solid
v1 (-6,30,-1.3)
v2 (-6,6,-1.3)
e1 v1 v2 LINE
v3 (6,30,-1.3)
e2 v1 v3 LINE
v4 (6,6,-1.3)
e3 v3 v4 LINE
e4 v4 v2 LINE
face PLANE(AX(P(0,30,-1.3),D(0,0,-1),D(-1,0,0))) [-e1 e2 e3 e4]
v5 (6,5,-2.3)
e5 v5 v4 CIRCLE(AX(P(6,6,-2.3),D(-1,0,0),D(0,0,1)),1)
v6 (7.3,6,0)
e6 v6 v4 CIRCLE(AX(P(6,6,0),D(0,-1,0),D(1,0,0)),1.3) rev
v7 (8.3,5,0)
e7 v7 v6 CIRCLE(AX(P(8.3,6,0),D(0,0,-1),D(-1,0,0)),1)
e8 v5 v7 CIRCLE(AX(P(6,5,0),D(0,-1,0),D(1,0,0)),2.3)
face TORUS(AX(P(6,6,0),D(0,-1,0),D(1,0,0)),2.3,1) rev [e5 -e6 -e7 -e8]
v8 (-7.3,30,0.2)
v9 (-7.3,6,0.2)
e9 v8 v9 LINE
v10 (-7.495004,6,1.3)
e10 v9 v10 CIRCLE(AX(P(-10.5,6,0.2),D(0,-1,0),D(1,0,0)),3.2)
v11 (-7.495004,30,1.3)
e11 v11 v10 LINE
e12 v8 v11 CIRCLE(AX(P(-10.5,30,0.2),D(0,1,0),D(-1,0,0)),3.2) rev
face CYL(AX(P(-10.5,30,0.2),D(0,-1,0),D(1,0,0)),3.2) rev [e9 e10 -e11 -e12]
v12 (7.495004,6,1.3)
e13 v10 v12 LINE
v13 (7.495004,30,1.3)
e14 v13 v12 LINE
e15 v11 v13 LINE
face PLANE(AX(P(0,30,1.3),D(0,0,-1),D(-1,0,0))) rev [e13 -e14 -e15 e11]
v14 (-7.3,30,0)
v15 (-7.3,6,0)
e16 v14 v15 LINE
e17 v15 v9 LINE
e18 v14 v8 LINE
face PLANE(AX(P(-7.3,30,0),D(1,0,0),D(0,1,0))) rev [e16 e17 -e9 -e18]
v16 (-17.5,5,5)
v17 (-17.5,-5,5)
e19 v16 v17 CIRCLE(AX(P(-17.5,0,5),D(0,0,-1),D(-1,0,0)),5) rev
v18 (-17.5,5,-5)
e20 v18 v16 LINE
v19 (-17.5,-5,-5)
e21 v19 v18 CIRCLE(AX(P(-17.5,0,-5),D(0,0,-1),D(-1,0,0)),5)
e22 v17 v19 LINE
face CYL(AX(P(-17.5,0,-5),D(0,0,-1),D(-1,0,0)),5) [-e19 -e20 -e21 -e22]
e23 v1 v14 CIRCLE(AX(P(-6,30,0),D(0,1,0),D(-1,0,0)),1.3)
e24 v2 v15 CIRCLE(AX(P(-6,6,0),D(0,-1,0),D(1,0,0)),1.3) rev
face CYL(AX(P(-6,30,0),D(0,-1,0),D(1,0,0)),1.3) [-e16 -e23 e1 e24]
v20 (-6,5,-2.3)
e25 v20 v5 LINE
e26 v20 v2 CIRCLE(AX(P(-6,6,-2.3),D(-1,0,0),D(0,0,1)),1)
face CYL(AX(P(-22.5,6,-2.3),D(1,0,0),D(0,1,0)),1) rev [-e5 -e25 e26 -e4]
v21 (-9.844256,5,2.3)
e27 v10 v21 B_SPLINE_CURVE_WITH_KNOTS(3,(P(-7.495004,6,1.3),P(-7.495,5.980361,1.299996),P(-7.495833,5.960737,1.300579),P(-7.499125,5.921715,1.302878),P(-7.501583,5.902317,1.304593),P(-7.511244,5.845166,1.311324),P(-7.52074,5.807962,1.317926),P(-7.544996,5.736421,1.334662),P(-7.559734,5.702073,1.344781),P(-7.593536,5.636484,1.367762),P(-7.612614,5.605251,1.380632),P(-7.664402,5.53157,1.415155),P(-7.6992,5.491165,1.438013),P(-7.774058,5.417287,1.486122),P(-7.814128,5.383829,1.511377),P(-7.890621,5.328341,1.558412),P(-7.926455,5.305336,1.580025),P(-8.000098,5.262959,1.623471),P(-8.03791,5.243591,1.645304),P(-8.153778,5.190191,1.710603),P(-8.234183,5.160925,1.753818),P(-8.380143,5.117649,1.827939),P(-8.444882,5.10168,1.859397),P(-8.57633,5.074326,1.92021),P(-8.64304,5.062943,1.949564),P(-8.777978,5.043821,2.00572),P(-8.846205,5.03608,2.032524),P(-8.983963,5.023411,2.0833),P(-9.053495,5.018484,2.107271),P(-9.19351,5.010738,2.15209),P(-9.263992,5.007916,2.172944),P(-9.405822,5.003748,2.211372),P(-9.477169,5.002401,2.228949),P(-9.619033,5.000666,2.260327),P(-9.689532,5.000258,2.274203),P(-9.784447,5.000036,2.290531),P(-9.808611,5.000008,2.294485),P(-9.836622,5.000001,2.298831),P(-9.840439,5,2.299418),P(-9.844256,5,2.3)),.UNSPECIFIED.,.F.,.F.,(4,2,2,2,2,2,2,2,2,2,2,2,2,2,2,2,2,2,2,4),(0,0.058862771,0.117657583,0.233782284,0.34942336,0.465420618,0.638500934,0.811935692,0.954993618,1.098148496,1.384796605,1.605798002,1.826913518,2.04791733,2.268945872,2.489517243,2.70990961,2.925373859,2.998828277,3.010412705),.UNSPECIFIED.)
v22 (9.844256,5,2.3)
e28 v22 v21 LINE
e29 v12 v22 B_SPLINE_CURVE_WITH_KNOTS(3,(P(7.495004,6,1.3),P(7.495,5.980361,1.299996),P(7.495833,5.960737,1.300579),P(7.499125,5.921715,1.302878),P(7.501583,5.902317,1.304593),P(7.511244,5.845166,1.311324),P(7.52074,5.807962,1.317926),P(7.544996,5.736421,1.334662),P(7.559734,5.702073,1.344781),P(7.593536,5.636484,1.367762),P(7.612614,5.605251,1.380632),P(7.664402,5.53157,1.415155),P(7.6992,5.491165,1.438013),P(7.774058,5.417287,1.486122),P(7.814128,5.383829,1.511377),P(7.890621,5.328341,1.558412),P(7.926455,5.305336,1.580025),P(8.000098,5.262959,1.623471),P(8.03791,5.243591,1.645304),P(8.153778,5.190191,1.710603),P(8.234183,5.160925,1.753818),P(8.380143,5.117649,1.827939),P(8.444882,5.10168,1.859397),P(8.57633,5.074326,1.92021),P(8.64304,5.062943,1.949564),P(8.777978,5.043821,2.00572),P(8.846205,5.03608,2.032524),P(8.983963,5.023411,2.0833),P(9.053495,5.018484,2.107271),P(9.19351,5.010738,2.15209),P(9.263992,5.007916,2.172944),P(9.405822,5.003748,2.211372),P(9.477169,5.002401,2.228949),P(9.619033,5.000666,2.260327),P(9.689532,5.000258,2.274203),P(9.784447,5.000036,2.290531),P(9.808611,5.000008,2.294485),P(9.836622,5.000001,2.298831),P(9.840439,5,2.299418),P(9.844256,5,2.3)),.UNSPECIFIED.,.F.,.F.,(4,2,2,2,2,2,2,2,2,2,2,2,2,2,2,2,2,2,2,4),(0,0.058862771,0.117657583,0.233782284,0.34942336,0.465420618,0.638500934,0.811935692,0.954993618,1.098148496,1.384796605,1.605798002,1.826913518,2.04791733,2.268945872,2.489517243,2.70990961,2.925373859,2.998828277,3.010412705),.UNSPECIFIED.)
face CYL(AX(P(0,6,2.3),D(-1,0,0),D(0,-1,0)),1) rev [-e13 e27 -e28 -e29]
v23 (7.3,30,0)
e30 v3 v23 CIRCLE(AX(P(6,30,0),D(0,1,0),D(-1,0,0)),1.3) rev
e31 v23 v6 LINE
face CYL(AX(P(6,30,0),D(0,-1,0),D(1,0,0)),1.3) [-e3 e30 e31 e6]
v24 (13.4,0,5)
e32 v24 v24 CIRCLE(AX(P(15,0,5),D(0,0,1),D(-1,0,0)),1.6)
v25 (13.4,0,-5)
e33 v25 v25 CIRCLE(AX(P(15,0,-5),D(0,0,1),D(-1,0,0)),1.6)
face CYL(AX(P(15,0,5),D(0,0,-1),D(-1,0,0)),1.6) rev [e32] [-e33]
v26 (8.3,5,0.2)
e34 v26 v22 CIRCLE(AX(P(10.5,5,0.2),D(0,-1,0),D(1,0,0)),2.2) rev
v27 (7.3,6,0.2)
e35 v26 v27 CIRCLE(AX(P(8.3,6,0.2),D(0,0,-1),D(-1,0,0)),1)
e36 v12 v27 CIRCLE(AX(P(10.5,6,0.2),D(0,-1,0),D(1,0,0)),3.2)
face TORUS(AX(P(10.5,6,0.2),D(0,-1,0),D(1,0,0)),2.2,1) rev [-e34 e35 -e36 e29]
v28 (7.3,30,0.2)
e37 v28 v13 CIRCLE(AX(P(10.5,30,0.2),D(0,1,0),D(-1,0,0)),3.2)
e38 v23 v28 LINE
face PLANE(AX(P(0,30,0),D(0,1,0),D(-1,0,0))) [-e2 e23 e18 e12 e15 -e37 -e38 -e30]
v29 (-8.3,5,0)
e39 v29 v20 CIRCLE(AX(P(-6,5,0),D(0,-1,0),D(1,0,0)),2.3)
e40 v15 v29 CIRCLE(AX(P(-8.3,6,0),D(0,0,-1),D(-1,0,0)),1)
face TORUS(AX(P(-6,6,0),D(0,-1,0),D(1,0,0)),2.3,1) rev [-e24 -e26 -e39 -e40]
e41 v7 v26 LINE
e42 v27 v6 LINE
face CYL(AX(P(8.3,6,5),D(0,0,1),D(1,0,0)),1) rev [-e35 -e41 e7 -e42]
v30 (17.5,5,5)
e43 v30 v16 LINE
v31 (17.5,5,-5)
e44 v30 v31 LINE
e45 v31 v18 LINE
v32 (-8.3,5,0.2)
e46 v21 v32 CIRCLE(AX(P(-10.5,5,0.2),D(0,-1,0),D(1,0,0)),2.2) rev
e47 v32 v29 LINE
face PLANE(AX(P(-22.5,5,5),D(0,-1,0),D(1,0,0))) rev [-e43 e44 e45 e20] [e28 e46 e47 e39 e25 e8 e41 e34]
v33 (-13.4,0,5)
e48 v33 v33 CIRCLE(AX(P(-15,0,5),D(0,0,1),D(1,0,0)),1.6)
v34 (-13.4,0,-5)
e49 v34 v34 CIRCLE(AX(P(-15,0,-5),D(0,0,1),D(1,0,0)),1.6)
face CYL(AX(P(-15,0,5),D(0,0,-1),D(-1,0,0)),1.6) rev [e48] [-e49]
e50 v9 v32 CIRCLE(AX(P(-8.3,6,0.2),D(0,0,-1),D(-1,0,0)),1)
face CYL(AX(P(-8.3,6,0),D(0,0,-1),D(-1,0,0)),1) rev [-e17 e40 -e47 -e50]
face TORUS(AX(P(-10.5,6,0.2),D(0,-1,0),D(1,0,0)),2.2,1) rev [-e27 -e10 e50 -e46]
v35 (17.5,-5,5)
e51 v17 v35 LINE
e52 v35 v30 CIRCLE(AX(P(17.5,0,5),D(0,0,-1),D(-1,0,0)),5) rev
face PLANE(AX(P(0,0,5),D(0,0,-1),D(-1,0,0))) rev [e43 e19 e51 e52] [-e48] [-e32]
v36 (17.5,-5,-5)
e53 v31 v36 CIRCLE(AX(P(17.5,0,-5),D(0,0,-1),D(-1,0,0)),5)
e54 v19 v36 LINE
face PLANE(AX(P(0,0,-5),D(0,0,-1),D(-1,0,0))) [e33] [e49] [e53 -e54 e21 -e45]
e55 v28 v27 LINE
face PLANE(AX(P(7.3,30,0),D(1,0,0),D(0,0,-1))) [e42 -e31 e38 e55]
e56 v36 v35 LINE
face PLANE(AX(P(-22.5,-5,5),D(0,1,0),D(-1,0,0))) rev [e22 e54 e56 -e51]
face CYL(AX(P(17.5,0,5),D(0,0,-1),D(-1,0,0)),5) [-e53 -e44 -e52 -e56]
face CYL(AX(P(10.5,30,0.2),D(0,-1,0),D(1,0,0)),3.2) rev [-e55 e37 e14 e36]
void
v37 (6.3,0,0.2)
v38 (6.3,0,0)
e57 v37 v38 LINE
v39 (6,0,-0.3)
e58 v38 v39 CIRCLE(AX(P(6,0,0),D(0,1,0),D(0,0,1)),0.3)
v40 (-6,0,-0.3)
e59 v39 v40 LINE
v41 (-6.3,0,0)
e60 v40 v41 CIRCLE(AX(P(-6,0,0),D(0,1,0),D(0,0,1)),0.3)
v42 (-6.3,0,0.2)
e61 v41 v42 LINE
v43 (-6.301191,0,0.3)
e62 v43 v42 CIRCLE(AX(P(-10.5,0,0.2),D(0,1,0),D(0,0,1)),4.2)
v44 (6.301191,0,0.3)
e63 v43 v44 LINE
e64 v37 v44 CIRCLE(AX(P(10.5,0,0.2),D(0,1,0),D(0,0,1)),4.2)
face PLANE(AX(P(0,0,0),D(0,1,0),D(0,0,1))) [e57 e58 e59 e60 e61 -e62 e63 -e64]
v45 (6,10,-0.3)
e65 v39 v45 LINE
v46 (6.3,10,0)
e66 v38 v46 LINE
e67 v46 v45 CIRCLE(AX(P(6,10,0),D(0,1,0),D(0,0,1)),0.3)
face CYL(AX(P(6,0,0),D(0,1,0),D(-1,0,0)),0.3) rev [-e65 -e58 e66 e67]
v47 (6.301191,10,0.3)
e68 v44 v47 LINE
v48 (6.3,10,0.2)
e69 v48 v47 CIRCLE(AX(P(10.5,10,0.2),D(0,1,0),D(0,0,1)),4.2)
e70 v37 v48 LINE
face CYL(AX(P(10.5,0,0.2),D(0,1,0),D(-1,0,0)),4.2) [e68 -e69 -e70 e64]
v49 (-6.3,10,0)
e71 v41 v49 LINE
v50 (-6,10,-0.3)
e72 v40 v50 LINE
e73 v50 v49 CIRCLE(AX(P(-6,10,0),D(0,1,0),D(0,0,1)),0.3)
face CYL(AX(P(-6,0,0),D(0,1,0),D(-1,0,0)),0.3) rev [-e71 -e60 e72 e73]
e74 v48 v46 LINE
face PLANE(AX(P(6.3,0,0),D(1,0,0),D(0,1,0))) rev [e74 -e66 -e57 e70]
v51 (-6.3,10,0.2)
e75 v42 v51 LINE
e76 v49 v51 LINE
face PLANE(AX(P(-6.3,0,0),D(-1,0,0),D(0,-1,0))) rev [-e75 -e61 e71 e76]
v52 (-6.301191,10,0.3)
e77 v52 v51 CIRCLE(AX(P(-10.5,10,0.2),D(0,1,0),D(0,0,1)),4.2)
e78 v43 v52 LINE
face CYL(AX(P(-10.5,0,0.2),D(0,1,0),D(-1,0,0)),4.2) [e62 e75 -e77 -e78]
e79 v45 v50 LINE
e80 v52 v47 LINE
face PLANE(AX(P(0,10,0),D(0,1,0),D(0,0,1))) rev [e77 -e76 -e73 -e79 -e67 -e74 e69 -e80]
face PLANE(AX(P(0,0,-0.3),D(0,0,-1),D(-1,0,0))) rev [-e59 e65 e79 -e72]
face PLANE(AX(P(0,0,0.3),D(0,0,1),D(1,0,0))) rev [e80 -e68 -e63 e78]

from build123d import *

# Parameters (mm, degrees)
SKETCH_1_W          = 45
SKETCH_1_H          = 10
SKETCH_1_R          = 1.6
EXTRUDE_1_DEPTH     = 5
FILLET_1_RADIUS     = 5
FILLET_1_LENGTH     = 10
FILLET_2_RADIUS     = 5
FILLET_2_LENGTH     = 10
EXTRUDE_2_DEPTH     = 25
FILLET_8_R          = 1
CUT_EXTRUDE_START   = -20
CUT_EXTRUDE_1_DEPTH = 10


with BuildPart() as part:
    # Эскиз1 → Бобышка-Вытянуть1 (new, symmetric)
    with BuildSketch(Plane.XY):
        Rectangle(SKETCH_1_W, SKETCH_1_H)
        with Locations((-15, 0)):
            Circle(SKETCH_1_R, mode=Mode.SUBTRACT)
        with Locations(Location((15, 0, 0), (0, 0, 180))):
            Circle(SKETCH_1_R, mode=Mode.SUBTRACT)
    extrude(amount=EXTRUDE_1_DEPTH, both=True)

    # Скругление1: full round fillet: the end face becomes a half cylinder, R = half its width
    fillet_1_face = Plane((-22.5, 0, 0), x_dir=(0, 0, 1), z_dir=(-1, 0, 0))  # on the end face: x along it, z out of the body
    fillet_1_slab = fillet_1_face.offset(-FILLET_1_RADIUS / 2) * Box(FILLET_1_LENGTH, 2 * FILLET_1_RADIUS, FILLET_1_RADIUS, mode=Mode.PRIVATE)  # the body's end, R deep
    fillet_1_round = Plane((-17.5, 0, 0), x_dir=(-1, 0, 0), z_dir=(0, 0, 1)) * Cylinder(FILLET_1_RADIUS, FILLET_1_LENGTH, mode=Mode.PRIVATE)  # its axis R under the face
    add(fillet_1_slab - fillet_1_round, mode=Mode.SUBTRACT)

    # Скругление2: full round fillet: the end face becomes a half cylinder, R = half its width
    fillet_2_face = Plane((22.5, 0, 0), x_dir=(0, 0, -1), z_dir=(1, 0, 0))  # on the end face: x along it, z out of the body
    fillet_2_slab = fillet_2_face.offset(-FILLET_2_RADIUS / 2) * Box(FILLET_2_LENGTH, 2 * FILLET_2_RADIUS, FILLET_2_RADIUS, mode=Mode.PRIVATE)  # the body's end, R deep
    fillet_2_round = Plane((17.5, 0, 0), x_dir=(1, 0, 0), z_dir=(0, 0, -1)) * Cylinder(FILLET_2_RADIUS, FILLET_2_LENGTH, mode=Mode.PRIVATE)  # its axis R under the face
    add(fillet_2_slab - fillet_2_round, mode=Mode.SUBTRACT)

    # Эскиз2 → Бобышка-Вытянуть2 (add)
    with BuildSketch(Plane(origin=(0, 5, 0), x_dir=(1, 0, 0), z_dir=(0, 1, 0))):
        with BuildLine():
            Line((-6, 1.3), (6, 1.3))
            ThreePointArc((6, 1.3), (6.919238816, 0.919238816), (7.3, 0))
            Line((7.3, 0), (7.3, -0.2))
            ThreePointArc((7.3, -0.2), (7.349128161, -0.758575559), (7.49500416, -1.3))
            Line((7.49500416, -1.3), (-7.49500416, -1.3))
            ThreePointArc((-7.49500416, -1.3), (-7.349128161, -0.758575559), (-7.3, -0.2))
            Line((-7.3, -0.2), (-7.3, 0))
            ThreePointArc((-7.3, 0), (-6.919238816, 0.919238816), (-6, 1.3))
        make_face()
    extrude(amount=EXTRUDE_2_DEPTH)

    # Скругление8
    fillet_8_edges = [part.edges().sort_by_distance(p)[0] for p in [
        (0, 5, 1.3),
    ]]
    fillet(fillet_8_edges, radius=FILLET_8_R)
    fillet_8_2_edges = [part.edges().sort_by_distance(p)[0] for p in [
        (-7.349128161, 5, 0.758575559),
        (7.349128161, 5, 0.758575559),
        (7.3, 5, 0.1),
        (6.919238816, 5, -0.919238816),
        (0, 5, -1.3),
        (-6.919238816, 5, -0.919238816),
        (-7.3, 5, 0.1),
    ]]
    fillet(fillet_8_2_edges, radius=FILLET_8_R - 0.0001)  # a hair under: the kernel refuses the full size

    # Эскиз3 → Вырез-Вытянуть1 (cut)
    with BuildSketch(Plane(origin=(0, 30, 0), x_dir=(1, 0, 0), z_dir=(0, 1, 0)).offset(CUT_EXTRUDE_START)):
        with BuildLine():
            Line((6.3, -0.2), (6.3, 0))
            ThreePointArc((6.3, 0), (6.212132034, 0.212132034), (6, 0.3))
            Line((6, 0.3), (-6, 0.3))
            ThreePointArc((-6, 0.3), (-6.212132034, 0.212132034), (-6.3, 0))
            Line((-6.3, 0), (-6.3, -0.2))
            ThreePointArc((-6.3, -0.2), (-6.300297672, -0.250003544), (-6.301190645, -0.3))
            Line((-6.301190645, -0.3), (6.301190645, -0.3))
            ThreePointArc((6.301190645, -0.3), (6.300297672, -0.250003544), (6.3, -0.2))
        make_face()
    extrude(amount=-CUT_EXTRUDE_1_DEPTH, mode=Mode.SUBTRACT)


solid = part.part
